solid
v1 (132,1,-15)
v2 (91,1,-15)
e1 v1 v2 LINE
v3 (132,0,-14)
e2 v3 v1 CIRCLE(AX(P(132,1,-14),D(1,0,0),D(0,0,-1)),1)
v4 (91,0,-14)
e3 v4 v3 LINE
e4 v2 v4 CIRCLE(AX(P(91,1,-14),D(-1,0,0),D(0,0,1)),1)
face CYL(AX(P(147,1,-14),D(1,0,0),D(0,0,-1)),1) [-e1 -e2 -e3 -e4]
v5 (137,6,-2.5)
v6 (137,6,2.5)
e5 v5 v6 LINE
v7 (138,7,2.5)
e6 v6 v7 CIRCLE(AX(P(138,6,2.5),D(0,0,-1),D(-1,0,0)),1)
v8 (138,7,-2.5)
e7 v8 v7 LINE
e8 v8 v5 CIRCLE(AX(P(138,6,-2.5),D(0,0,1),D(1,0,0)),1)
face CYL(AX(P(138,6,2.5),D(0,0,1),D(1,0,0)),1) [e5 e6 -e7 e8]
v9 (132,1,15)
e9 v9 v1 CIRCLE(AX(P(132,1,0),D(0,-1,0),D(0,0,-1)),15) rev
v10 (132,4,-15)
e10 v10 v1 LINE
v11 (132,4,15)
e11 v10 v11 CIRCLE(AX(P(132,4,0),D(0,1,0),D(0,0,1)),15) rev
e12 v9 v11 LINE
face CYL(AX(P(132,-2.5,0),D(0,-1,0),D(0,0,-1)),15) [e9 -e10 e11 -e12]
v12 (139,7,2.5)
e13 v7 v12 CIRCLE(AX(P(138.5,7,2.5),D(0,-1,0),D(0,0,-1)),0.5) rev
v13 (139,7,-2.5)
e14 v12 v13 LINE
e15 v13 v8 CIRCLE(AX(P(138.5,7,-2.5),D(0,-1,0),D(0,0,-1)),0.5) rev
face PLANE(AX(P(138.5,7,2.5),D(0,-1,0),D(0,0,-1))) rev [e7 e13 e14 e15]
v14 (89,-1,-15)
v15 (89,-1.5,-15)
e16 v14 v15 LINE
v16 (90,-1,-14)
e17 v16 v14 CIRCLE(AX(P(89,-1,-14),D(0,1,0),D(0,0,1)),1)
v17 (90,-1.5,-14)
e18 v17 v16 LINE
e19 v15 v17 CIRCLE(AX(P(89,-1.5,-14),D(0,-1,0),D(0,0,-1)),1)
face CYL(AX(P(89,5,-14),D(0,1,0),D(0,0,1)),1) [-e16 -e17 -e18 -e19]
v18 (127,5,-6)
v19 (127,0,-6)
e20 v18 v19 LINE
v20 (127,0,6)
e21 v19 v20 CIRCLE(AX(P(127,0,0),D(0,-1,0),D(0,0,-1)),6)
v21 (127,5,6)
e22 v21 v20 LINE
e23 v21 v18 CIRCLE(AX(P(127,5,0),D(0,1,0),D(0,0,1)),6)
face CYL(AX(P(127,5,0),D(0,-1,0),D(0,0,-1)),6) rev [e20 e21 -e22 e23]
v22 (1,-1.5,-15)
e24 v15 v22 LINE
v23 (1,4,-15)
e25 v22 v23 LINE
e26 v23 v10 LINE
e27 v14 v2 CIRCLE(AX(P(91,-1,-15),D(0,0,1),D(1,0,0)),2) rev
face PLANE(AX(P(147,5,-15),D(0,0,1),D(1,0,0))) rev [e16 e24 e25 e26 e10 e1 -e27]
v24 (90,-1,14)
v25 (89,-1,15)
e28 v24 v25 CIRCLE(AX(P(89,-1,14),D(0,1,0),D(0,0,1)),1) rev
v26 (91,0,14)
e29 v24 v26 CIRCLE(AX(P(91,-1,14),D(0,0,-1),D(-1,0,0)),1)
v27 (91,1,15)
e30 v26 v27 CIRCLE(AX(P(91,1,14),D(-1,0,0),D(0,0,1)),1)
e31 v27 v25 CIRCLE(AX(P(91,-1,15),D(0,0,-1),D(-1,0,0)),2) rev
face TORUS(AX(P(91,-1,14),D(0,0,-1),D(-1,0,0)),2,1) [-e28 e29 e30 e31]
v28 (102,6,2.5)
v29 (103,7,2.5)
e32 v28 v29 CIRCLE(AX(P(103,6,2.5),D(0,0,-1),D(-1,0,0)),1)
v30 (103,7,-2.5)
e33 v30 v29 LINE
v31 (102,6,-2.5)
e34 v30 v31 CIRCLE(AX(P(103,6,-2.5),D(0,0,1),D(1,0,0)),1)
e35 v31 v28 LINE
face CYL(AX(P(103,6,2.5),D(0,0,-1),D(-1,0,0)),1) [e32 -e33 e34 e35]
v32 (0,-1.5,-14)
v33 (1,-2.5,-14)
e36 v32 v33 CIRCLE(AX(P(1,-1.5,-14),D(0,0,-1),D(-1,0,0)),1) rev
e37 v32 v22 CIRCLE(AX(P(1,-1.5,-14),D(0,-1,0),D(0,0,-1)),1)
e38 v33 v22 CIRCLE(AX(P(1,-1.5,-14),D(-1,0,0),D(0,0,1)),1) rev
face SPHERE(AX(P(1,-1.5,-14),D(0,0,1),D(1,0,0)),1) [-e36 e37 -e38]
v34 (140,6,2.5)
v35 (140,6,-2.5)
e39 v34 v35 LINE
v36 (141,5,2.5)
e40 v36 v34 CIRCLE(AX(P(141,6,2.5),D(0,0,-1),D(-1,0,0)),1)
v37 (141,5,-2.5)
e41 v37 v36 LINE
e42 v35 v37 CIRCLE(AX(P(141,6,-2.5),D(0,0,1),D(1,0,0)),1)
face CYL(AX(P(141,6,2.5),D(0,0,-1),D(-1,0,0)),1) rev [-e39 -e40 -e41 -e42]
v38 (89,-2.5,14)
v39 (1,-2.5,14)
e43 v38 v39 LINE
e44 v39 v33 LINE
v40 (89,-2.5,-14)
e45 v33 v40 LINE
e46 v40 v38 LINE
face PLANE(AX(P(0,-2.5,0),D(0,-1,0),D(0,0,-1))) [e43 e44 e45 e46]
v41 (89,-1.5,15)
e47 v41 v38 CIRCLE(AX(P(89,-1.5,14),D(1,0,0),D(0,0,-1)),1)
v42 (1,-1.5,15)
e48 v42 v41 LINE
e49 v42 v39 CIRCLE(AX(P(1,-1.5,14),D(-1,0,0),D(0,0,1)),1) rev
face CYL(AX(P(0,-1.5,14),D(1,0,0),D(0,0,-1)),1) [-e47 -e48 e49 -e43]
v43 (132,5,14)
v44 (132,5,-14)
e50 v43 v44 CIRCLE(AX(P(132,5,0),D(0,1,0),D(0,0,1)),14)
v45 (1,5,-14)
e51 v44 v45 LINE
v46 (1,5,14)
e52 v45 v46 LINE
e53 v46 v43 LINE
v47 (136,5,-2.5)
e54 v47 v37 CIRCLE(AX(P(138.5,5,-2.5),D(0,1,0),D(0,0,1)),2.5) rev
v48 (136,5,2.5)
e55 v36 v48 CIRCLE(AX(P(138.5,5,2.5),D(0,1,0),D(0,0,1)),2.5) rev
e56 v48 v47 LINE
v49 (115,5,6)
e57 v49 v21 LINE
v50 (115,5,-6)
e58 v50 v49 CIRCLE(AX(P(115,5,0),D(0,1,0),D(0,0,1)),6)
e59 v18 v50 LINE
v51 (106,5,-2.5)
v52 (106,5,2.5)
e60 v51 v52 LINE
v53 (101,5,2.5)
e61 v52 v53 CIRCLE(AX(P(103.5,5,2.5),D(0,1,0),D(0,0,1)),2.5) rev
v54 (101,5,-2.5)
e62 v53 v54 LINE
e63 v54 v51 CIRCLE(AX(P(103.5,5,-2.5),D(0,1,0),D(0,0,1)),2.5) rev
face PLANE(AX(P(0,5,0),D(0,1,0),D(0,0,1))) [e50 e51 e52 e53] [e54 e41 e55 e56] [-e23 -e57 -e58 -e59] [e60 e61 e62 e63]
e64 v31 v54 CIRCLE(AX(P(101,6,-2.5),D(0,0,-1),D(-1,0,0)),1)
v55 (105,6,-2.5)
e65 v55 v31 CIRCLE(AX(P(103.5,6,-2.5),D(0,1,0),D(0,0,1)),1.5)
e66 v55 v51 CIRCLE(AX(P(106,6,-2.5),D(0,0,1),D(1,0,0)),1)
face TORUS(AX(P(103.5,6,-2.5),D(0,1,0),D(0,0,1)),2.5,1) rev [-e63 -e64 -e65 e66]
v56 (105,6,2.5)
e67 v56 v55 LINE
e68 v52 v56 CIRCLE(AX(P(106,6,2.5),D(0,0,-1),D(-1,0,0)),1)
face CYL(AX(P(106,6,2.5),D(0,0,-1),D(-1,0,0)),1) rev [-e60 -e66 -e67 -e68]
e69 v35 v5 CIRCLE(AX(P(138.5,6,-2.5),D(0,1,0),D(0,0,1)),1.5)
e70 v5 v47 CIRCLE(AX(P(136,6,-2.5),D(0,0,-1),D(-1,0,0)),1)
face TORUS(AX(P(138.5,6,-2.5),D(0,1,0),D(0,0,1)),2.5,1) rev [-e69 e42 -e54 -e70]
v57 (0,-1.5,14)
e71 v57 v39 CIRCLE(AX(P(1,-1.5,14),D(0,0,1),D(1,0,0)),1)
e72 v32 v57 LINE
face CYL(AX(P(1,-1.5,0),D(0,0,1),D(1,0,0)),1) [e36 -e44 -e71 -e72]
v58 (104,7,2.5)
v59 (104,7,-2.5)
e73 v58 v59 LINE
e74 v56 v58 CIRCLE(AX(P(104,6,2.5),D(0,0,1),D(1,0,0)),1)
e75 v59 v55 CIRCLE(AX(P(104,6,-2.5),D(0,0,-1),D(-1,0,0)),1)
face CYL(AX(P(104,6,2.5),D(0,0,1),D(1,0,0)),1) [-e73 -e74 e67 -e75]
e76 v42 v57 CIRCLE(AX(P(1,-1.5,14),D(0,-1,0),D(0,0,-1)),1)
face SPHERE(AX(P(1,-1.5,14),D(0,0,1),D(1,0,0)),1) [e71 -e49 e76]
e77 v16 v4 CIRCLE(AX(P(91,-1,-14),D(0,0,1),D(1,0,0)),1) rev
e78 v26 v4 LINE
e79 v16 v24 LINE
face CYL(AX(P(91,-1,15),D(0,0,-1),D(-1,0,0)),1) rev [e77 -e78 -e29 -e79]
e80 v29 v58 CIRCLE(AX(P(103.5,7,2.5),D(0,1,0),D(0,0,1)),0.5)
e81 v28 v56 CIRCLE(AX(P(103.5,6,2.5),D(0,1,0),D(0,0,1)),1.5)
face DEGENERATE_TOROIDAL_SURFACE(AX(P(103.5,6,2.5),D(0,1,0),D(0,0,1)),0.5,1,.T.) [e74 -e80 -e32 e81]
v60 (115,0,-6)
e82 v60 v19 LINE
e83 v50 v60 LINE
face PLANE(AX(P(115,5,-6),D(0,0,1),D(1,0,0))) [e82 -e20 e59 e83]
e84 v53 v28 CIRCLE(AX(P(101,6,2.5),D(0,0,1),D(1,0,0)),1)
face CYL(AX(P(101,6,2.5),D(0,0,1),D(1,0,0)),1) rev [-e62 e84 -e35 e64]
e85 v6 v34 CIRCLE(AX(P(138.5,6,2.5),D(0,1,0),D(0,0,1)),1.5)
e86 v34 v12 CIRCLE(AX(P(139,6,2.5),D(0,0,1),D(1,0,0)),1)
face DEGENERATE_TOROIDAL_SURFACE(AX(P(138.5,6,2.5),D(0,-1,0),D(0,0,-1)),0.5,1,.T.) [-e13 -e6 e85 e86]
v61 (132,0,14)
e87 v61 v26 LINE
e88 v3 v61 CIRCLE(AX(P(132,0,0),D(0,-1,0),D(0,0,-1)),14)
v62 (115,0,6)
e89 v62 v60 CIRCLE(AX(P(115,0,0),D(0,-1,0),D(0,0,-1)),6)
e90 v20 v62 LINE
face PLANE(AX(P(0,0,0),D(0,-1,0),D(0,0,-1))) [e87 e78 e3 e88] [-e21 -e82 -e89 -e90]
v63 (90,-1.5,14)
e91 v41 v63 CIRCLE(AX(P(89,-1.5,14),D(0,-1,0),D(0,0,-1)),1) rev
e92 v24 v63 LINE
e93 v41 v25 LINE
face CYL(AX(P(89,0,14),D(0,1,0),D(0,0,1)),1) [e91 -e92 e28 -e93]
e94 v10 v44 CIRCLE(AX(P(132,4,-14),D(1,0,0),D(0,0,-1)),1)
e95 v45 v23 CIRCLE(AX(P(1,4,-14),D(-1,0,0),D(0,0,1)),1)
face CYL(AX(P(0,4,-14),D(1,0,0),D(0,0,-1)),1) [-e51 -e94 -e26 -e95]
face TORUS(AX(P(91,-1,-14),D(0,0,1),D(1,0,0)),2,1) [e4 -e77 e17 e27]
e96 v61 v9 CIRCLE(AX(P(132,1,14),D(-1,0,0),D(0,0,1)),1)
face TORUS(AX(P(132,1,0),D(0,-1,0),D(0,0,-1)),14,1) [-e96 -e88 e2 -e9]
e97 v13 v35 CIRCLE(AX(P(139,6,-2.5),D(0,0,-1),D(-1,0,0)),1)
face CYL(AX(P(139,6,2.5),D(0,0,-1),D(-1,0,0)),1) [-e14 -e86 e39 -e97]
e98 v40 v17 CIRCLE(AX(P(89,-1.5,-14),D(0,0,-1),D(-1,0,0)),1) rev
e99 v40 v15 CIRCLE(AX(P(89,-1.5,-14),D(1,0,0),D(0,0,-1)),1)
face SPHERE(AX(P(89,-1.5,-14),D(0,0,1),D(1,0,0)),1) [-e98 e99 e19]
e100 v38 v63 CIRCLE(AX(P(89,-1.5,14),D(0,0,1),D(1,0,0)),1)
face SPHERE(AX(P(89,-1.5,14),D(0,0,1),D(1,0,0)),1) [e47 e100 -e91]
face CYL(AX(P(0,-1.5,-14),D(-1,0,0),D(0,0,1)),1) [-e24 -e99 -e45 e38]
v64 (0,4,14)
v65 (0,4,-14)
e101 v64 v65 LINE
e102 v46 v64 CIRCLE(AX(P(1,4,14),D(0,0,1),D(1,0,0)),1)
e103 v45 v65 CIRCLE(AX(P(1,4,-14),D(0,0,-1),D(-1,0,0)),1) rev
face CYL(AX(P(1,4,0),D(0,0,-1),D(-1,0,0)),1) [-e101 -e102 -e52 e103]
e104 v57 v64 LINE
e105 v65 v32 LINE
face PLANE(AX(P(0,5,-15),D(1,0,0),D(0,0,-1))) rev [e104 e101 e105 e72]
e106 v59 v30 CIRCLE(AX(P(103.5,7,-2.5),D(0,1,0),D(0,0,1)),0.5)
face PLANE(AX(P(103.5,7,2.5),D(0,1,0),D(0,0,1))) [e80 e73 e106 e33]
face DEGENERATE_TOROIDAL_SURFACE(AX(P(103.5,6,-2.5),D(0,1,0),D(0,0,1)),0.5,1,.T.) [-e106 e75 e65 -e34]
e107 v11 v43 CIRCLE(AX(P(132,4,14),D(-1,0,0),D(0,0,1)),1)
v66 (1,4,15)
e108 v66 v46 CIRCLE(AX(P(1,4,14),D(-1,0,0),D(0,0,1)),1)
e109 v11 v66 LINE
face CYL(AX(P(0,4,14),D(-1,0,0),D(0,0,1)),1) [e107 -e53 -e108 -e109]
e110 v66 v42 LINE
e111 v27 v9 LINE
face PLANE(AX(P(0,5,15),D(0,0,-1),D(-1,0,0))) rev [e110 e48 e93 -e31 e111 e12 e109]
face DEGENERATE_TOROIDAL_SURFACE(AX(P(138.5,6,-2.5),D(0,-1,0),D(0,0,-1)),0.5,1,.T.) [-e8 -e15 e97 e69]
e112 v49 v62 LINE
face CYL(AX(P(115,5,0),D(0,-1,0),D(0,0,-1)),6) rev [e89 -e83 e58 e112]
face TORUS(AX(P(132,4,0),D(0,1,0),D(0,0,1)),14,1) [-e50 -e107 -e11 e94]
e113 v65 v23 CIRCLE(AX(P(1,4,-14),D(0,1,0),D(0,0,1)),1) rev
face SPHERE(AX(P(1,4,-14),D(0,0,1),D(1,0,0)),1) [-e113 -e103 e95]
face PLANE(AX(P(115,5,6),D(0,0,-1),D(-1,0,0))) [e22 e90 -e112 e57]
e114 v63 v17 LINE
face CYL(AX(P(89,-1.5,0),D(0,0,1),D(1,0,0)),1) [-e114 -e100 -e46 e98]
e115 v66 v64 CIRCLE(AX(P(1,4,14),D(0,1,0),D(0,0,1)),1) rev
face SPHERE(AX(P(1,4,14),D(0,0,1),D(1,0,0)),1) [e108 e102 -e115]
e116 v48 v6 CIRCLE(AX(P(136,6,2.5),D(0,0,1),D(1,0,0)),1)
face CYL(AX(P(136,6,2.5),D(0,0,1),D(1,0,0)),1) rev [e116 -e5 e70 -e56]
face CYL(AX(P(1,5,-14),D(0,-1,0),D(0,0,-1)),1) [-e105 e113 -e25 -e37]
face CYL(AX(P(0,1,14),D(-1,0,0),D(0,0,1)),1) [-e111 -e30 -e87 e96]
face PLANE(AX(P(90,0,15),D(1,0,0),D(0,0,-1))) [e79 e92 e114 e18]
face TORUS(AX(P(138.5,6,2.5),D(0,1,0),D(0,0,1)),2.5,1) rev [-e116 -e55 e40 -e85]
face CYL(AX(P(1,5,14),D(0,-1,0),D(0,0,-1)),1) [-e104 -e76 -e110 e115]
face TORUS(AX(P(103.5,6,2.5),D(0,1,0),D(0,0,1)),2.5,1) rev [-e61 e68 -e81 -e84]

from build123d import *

# Parameters (mm, degrees)
SZKIC6_W                    = 147
SZKIC6_H                    = 30
DODANIE_WYCI_GNI_CIE2_DEPTH = 5
DODANIE_WYCI_GNI_CIE3_START = 2.5
SZKIC8_W                    = 147
SZKIC8_H                    = 30
DODANIE_WYCI_GNI_CIE3_DEPTH = 2.5
ZAOKR_GLENIE2_RADIUS        = 15
ZAOKR_GLENIE2_LENGTH        = 7.5
SZKIC9_W                    = 57
SZKIC9_H                    = 30
WYTNIJ_WYCI_GNI_CIE1_DEPTH  = 2.5
ZAOKR_GLENIE3_R             = 1
DODANIE_WYCI_GNI_CIE4_DEPTH = 2
ZAOKR_GLENIE4_R             = 1


with BuildPart() as part:
    # Szkic6 → Dodanie-wyciągnięcie2 (new body)
    with BuildSketch(Plane(origin=(0, 0, -30), x_dir=(-1, 0, 0), z_dir=(0, 1, 0))):
        with Locations((-73.5, 30)):
            Rectangle(SZKIC6_W, SZKIC6_H)
        with BuildLine():
            Line((-115, 36), (-127, 36))
            ThreePointArc((-127, 36), (-133, 30), (-127, 24))
            Line((-127, 24), (-115, 24))
            ThreePointArc((-115, 24), (-109, 30), (-115, 36))
        make_face(mode=Mode.SUBTRACT)
    extrude(amount=DODANIE_WYCI_GNI_CIE2_DEPTH)

    # Szkic8 → Dodanie-wyciągnięcie3 (add)
    with BuildSketch(Plane.XZ.offset(DODANIE_WYCI_GNI_CIE3_START)):
        with Locations((73.5, 0)):
            Rectangle(SZKIC8_W, SZKIC8_H)
        with BuildLine():
            Line((127, -6), (115, -6))
            ThreePointArc((115, -6), (109, 0), (115, 6))
            Line((115, 6), (127, 6))
            ThreePointArc((127, 6), (133, 0), (127, -6))
        make_face(mode=Mode.SUBTRACT)
    extrude(amount=-DODANIE_WYCI_GNI_CIE3_DEPTH)

    # Zaokrąglenie2: full round fillet: the end face becomes a half cylinder, R = half its width
    zaokr_glenie2_face = Plane((147, 1.25, 0), x_dir=(0, -1, 0), z_dir=(1, 0, 0))  # on the end face: x along it, z out of the body
    zaokr_glenie2_slab = zaokr_glenie2_face.offset(-ZAOKR_GLENIE2_RADIUS / 2) * Box(ZAOKR_GLENIE2_LENGTH, 2 * ZAOKR_GLENIE2_RADIUS, ZAOKR_GLENIE2_RADIUS, mode=Mode.PRIVATE)  # the body's end, R deep
    zaokr_glenie2_round = Plane((132, 1.25, 0), x_dir=(1, 0, 0), z_dir=(0, -1, 0)) * Cylinder(ZAOKR_GLENIE2_RADIUS, ZAOKR_GLENIE2_LENGTH, mode=Mode.PRIVATE)  # its axis R under the face
    add(zaokr_glenie2_slab - zaokr_glenie2_round, mode=Mode.SUBTRACT)

    # Szkic9 → Wytnij-wyciągnięcie1 (cut)
    with BuildSketch(Plane(origin=(0, -2.5, 0), x_dir=(1, 0, 0), z_dir=(0, 1, 0))):
        with Locations((118.5, 0)):
            Rectangle(SZKIC9_W, SZKIC9_H)
    extrude(amount=WYTNIJ_WYCI_GNI_CIE1_DEPTH, mode=Mode.SUBTRACT)

    # Zaokrąglenie3
    zaokr_glenie3_edges = [part.edges().sort_by_distance(p)[0] for p in [
        (0, 5, 0),
        (66, 5, 15),
        (0, -2.5, 0),
        (45, -2.5, -15),
        (66, 5, -15),
        (147, 5, 0),
        (45, -2.5, 15),
        (90, -2.5, 0),
        (90, -1.25, -15),
        (90, -1.25, 15),
        (111, 0, 15),
        (147, 0, 0),
        (111, 0, -15),
        (90, 0, 0),
        (0, 1.25, 15),
        (0, 1.25, -15),
    ]]
    fillet(zaokr_glenie3_edges, radius=ZAOKR_GLENIE3_R)

    # Szkic10 → Dodanie-wyciągnięcie4 (add)
    with BuildSketch(Plane(origin=(0, 5, 0), x_dir=(1, 0, 0), z_dir=(0, 1, 0))):
        with BuildLine():
            Line((102, -2.5), (102, 2.5))
            ThreePointArc((102, 2.5), (103.5, 4), (105, 2.5))
            Line((105, 2.5), (105, -2.5))
            ThreePointArc((105, -2.5), (103.5, -4), (102, -2.5))
        make_face()
        with BuildLine():
            Line((140, -2.5), (140, 2.5))
            ThreePointArc((140, 2.5), (138.5, 4), (137, 2.5))
            Line((137, 2.5), (137, -2.5))
            ThreePointArc((137, -2.5), (138.5, -4), (140, -2.5))
        make_face()
    extrude(amount=DODANIE_WYCI_GNI_CIE4_DEPTH)

    # Zaokrąglenie4
    zaokr_glenie4_edges = [part.edges().sort_by_distance(p)[0] for p in [
        (137, 7, 0),
        (138.5, 7, -4),
        (140, 7, 0),
        (137, 5, 0),
        (138.5, 5, -4),
        (140, 5, 0),
        (102, 7, 0),
        (103.5, 7, -4),
        (105, 7, 0),
        (102, 5, 0),
        (103.5, 5, -4),
        (105, 5, 0),
        (138.5, 7, 4),
        (138.5, 5, 4),
        (103.5, 7, 4),
        (103.5, 5, 4),
    ]]
    fillet(zaokr_glenie4_edges, radius=ZAOKR_GLENIE4_R - 0.0001)  # a hair under: the kernel refuses the full size


solid = part.part
